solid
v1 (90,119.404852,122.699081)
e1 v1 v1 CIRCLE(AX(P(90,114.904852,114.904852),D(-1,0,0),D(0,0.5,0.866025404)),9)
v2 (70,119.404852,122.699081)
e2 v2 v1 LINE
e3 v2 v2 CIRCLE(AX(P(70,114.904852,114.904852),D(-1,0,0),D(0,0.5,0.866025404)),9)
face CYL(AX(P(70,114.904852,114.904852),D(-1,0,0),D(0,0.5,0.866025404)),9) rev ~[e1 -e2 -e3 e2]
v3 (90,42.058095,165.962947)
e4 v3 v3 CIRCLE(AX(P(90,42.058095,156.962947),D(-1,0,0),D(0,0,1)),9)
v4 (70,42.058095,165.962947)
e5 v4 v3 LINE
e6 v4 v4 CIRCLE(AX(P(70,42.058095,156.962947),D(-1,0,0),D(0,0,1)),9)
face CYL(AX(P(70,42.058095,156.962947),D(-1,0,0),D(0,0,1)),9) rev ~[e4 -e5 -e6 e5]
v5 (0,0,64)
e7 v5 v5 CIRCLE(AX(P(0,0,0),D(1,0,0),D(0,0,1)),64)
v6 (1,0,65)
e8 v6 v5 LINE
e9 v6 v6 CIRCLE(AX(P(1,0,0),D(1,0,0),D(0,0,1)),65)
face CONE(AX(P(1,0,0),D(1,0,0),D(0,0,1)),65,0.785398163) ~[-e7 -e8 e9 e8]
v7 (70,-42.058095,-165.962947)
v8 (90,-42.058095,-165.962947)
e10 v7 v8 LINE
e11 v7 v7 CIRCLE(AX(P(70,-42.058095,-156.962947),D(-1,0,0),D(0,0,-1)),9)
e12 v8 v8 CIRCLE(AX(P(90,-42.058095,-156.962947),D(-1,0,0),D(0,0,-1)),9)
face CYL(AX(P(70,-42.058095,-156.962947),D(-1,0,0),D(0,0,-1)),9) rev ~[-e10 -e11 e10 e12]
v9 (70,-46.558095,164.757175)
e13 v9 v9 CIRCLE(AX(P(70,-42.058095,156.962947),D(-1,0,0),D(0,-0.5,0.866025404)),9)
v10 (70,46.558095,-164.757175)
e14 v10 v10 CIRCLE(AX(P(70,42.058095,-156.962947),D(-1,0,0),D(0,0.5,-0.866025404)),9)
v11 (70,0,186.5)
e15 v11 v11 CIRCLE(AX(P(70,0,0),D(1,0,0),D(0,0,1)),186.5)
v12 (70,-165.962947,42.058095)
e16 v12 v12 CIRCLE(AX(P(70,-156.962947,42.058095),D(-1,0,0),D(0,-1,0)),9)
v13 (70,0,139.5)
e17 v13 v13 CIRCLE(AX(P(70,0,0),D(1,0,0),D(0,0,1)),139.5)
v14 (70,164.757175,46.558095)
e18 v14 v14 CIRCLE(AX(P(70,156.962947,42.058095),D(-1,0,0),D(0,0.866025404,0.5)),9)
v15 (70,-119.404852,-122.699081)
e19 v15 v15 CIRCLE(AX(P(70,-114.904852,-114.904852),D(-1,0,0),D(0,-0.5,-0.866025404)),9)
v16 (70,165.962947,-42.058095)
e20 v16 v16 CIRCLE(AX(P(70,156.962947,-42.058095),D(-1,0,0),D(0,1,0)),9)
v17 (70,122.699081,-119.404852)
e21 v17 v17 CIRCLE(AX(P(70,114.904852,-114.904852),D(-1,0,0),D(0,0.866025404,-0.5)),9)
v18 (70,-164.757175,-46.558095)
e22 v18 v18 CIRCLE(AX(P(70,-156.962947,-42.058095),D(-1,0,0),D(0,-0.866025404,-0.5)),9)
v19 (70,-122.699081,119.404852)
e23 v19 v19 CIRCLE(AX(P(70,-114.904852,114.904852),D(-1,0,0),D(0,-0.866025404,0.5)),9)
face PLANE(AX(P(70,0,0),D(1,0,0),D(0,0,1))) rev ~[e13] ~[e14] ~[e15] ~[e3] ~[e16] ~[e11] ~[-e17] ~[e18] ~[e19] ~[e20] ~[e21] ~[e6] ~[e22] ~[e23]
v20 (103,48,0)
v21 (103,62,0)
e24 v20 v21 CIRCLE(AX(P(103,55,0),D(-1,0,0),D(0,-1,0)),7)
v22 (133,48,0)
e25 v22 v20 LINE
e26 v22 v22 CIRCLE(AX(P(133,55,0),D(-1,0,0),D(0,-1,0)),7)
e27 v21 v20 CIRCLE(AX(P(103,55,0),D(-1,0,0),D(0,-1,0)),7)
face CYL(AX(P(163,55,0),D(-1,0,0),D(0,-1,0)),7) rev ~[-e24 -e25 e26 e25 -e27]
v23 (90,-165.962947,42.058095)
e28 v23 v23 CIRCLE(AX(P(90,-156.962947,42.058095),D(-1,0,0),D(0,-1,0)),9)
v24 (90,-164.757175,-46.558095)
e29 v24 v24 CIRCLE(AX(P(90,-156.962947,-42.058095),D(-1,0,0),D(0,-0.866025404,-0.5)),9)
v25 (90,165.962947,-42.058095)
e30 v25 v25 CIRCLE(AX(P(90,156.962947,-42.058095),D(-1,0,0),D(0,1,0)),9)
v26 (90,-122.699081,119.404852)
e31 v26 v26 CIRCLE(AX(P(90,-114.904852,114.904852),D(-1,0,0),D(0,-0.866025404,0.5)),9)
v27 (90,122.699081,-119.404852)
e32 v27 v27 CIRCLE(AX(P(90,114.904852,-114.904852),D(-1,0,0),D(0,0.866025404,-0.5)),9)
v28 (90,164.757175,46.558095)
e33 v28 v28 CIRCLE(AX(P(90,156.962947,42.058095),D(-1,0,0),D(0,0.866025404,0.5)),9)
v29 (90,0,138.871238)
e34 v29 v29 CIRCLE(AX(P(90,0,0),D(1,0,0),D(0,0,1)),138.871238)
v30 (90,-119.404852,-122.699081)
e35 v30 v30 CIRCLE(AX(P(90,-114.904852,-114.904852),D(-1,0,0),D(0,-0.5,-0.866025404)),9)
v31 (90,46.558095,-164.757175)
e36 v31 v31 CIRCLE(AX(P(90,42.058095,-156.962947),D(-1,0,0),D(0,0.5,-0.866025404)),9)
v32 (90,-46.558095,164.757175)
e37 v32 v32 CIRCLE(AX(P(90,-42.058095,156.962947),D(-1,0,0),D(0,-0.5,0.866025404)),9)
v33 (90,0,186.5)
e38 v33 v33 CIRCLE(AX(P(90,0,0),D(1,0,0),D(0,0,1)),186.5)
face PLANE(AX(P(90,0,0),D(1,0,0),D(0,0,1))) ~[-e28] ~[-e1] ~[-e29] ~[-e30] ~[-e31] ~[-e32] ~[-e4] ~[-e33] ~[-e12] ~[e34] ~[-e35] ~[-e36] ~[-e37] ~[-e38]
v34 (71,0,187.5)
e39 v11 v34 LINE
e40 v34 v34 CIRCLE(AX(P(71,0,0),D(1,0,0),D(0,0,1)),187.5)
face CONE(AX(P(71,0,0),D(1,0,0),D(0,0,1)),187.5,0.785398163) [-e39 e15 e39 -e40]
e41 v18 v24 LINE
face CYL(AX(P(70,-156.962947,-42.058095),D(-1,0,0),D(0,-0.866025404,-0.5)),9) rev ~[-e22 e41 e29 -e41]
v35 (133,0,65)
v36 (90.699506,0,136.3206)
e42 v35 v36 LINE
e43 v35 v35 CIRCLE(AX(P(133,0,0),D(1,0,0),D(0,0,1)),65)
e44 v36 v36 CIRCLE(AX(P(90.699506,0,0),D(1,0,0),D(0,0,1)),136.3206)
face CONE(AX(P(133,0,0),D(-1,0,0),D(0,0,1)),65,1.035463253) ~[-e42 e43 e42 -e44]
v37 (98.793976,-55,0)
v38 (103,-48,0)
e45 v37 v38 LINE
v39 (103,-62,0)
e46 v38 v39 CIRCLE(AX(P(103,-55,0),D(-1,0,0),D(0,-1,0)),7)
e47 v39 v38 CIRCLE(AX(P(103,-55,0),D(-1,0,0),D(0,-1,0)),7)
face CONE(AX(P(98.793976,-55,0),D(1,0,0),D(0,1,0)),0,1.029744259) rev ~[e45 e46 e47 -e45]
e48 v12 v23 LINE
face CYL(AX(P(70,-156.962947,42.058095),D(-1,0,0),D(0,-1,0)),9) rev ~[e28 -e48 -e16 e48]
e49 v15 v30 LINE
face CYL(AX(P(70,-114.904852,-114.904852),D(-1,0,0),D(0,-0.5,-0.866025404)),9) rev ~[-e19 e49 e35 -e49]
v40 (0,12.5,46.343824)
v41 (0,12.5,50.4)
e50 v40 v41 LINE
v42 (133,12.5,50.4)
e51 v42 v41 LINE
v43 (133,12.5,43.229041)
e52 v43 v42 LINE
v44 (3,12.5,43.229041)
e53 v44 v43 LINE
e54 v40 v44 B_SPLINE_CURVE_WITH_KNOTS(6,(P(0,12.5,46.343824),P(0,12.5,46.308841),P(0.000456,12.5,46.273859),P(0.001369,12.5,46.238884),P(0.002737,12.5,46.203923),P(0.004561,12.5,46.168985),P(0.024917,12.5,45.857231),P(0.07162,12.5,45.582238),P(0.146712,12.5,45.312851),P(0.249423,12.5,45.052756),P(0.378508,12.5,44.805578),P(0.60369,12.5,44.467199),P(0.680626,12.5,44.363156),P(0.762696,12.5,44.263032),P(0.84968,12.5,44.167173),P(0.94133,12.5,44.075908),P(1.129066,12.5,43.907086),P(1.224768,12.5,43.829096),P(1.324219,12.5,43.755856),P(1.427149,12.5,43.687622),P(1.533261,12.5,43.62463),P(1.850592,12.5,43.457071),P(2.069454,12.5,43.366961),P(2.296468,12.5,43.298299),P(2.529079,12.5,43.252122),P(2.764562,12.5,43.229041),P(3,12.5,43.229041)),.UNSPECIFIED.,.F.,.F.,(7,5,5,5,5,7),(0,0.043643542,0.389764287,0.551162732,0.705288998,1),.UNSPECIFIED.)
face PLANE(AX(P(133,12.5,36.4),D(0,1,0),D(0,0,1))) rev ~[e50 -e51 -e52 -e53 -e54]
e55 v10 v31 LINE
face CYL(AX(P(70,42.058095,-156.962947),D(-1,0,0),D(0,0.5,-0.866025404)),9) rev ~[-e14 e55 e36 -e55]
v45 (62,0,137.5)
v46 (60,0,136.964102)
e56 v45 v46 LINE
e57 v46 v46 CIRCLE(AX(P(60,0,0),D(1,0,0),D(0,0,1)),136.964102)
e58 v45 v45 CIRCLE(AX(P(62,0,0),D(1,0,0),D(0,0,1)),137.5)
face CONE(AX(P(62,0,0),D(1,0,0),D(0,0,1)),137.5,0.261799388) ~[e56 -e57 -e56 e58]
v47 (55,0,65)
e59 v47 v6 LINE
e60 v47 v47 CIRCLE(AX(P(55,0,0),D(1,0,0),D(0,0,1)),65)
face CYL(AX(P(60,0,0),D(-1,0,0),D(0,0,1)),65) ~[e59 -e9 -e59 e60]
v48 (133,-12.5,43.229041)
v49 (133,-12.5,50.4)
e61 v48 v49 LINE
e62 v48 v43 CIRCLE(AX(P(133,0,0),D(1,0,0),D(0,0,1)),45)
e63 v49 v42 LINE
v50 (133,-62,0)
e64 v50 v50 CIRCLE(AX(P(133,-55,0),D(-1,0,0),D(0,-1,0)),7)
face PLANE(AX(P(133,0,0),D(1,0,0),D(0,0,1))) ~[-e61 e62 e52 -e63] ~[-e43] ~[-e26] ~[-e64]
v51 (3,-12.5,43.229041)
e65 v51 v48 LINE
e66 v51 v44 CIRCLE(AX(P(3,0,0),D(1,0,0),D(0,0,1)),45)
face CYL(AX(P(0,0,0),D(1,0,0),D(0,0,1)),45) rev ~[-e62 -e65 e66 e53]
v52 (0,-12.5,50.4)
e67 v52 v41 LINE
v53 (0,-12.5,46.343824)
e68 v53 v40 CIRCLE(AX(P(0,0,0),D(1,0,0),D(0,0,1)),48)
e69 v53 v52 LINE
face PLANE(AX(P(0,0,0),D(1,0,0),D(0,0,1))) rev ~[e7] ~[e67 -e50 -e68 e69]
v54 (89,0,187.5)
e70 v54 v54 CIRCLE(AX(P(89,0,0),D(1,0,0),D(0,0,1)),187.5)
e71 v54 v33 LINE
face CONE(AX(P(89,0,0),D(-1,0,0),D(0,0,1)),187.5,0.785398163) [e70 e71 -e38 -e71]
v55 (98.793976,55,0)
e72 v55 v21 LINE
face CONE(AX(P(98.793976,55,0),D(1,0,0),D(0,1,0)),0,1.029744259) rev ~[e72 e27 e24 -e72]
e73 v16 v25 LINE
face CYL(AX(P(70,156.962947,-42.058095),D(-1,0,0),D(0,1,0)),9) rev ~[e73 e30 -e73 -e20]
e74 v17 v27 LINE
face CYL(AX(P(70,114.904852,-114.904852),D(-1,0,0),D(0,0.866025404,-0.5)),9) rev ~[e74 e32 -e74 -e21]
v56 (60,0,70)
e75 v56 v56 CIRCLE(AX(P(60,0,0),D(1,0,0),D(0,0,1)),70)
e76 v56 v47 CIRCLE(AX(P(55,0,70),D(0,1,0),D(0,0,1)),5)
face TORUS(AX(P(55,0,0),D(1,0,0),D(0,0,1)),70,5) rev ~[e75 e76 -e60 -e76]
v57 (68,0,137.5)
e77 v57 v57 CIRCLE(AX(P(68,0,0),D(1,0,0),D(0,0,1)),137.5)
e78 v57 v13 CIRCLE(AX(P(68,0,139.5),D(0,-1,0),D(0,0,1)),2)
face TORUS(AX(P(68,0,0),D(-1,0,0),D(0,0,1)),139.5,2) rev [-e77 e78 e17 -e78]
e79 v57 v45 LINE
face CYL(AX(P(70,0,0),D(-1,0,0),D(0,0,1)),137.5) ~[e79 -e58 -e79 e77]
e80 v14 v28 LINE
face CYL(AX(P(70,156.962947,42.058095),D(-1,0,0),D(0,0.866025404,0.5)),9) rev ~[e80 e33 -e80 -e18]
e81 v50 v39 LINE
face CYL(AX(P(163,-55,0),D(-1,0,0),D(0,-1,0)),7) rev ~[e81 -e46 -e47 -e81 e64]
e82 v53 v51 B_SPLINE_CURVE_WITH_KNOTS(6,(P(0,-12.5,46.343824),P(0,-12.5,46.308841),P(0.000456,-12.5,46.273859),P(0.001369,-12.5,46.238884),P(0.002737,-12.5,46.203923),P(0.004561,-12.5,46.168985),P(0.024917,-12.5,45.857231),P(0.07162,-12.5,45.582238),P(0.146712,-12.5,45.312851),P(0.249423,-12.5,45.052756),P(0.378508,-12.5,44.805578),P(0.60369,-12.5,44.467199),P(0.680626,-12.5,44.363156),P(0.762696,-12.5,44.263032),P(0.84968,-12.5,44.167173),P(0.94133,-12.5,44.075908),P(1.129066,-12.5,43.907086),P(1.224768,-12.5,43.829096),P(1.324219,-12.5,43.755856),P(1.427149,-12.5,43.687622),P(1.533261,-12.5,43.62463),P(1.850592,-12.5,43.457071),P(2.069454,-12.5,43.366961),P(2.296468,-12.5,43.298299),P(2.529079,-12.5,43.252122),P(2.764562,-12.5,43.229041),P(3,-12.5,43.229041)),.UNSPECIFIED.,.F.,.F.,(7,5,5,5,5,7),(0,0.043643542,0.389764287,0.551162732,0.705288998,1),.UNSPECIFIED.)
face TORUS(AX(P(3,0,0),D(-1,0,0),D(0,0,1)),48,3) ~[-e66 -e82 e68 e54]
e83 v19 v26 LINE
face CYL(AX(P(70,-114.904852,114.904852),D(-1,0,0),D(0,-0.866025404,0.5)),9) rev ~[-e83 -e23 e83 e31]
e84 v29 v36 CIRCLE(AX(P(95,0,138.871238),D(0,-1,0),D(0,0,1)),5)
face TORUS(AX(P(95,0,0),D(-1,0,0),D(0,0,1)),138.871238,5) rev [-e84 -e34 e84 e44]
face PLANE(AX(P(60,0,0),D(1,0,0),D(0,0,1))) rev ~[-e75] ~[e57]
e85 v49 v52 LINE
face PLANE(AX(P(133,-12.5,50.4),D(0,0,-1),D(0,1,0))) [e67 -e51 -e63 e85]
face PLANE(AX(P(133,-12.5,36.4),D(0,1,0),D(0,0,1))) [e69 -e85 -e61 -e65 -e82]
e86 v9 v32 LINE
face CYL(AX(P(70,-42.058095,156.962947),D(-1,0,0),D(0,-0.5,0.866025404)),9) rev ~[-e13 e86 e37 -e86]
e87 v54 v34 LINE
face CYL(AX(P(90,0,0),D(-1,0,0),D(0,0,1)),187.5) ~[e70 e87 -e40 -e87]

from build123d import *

# Parameters (mm, degrees)
F2_SIZE2         = 0.5358983849
F2_SIZE          = 2
F3_R             = 5
F4_SIZE          = 1
F5_R             = 2
F6_R             = 3
F8_D             = 14
F8_DEPTH         = 30
F8_TIP           = 4.2060243332
F9_W             = 25
F9_H             = 14
F10_DEPTH        = 133.001
F11_R            = 9
F12_DEPTH        = 25
F12_COPIES_COUNT = 12


# Not quite as in the source:
# - a pattern or mirror of a feature is missing from the dataset's text; its kind, count and spacing are read off the source's solid


with BuildPart() as f1:
    # F0 (on Front) → F1 (revolve)
    with BuildSketch(Plane.XZ):
        Polygon((0, 65), (0, 45), (133, 45), (133, 65), (90, 137.5), (90, 187.5), (70, 187.5), (70, 137.5), (60, 137.5), (60, 65), align=None)
    revolve(axis=Axis((87.7174822803, 0, 0), (1, 0, 0)))

    # F2
    f2_edges = [f1.edges().sort_by_distance(p)[0] for p in [
        (60, 0, -137.5),
    ]]
    chamfer(f2_edges, length=F2_SIZE, length2=F2_SIZE2)

    # F3
    f3_edges = [f1.edges().sort_by_distance(p)[0] for p in [
        (60, 0, -65),
        (90, 0, -137.5),
    ]]
    fillet(f3_edges, radius=F3_R)

    # F4
    f4_edges = [f1.edges().sort_by_distance(p)[0] for p in [
        (0, 0, -65),
        (70, 0, -187.5),
        (90, 0, -187.5),
    ]]
    chamfer(f4_edges, length=F4_SIZE)

    # F5
    f5_edges = [f1.edges().sort_by_distance(p)[0] for p in [
        (70, 0, -137.5),
    ]]
    fillet(f5_edges, radius=F5_R)

    # F6
    f6_edges = [f1.edges().sort_by_distance(p)[0] for p in [
        (0, 0, -45),
    ]]
    fillet(f6_edges, radius=F6_R)

    # F8
    with Locations(Plane.YZ.offset(133)):
        with Locations((55, 0), (-55, 0)):
            Hole(F8_D / 2, depth=F8_DEPTH)
            with Locations((0, 0, -(F8_DEPTH + F8_TIP / 2))):  # 118° drill point
                Cone(0, F8_D / 2, F8_TIP, mode=Mode.SUBTRACT)

    # F9 (on face) → F10 (cut, through all)
    with BuildSketch(Plane.YZ.offset(133)):
        with Locations((0, 43.4)):
            Rectangle(F9_W, F9_H)
    extrude(amount=-F10_DEPTH, mode=Mode.SUBTRACT)

    # F11 (on face) → F12 (cut)
    with BuildSketch(Plane(origin=(70, 0, 0), x_dir=(0, -1, 0), z_dir=(-1, 0, 0))):
        with Locations((156.962946772, 42.0580948292)):
            Circle(F11_R)
    f12 = extrude(amount=-F12_DEPTH, mode=Mode.SUBTRACT)

    # F12_copies: F12 ×12 about axis
    f12_copies_axis = Axis((0, 0, 0), (1, 0, 0))
    for i in range(1, F12_COPIES_COUNT):
        add(f12.rotate(f12_copies_axis, i * 360 / F12_COPIES_COUNT), mode=Mode.SUBTRACT)


solid = f1.part
